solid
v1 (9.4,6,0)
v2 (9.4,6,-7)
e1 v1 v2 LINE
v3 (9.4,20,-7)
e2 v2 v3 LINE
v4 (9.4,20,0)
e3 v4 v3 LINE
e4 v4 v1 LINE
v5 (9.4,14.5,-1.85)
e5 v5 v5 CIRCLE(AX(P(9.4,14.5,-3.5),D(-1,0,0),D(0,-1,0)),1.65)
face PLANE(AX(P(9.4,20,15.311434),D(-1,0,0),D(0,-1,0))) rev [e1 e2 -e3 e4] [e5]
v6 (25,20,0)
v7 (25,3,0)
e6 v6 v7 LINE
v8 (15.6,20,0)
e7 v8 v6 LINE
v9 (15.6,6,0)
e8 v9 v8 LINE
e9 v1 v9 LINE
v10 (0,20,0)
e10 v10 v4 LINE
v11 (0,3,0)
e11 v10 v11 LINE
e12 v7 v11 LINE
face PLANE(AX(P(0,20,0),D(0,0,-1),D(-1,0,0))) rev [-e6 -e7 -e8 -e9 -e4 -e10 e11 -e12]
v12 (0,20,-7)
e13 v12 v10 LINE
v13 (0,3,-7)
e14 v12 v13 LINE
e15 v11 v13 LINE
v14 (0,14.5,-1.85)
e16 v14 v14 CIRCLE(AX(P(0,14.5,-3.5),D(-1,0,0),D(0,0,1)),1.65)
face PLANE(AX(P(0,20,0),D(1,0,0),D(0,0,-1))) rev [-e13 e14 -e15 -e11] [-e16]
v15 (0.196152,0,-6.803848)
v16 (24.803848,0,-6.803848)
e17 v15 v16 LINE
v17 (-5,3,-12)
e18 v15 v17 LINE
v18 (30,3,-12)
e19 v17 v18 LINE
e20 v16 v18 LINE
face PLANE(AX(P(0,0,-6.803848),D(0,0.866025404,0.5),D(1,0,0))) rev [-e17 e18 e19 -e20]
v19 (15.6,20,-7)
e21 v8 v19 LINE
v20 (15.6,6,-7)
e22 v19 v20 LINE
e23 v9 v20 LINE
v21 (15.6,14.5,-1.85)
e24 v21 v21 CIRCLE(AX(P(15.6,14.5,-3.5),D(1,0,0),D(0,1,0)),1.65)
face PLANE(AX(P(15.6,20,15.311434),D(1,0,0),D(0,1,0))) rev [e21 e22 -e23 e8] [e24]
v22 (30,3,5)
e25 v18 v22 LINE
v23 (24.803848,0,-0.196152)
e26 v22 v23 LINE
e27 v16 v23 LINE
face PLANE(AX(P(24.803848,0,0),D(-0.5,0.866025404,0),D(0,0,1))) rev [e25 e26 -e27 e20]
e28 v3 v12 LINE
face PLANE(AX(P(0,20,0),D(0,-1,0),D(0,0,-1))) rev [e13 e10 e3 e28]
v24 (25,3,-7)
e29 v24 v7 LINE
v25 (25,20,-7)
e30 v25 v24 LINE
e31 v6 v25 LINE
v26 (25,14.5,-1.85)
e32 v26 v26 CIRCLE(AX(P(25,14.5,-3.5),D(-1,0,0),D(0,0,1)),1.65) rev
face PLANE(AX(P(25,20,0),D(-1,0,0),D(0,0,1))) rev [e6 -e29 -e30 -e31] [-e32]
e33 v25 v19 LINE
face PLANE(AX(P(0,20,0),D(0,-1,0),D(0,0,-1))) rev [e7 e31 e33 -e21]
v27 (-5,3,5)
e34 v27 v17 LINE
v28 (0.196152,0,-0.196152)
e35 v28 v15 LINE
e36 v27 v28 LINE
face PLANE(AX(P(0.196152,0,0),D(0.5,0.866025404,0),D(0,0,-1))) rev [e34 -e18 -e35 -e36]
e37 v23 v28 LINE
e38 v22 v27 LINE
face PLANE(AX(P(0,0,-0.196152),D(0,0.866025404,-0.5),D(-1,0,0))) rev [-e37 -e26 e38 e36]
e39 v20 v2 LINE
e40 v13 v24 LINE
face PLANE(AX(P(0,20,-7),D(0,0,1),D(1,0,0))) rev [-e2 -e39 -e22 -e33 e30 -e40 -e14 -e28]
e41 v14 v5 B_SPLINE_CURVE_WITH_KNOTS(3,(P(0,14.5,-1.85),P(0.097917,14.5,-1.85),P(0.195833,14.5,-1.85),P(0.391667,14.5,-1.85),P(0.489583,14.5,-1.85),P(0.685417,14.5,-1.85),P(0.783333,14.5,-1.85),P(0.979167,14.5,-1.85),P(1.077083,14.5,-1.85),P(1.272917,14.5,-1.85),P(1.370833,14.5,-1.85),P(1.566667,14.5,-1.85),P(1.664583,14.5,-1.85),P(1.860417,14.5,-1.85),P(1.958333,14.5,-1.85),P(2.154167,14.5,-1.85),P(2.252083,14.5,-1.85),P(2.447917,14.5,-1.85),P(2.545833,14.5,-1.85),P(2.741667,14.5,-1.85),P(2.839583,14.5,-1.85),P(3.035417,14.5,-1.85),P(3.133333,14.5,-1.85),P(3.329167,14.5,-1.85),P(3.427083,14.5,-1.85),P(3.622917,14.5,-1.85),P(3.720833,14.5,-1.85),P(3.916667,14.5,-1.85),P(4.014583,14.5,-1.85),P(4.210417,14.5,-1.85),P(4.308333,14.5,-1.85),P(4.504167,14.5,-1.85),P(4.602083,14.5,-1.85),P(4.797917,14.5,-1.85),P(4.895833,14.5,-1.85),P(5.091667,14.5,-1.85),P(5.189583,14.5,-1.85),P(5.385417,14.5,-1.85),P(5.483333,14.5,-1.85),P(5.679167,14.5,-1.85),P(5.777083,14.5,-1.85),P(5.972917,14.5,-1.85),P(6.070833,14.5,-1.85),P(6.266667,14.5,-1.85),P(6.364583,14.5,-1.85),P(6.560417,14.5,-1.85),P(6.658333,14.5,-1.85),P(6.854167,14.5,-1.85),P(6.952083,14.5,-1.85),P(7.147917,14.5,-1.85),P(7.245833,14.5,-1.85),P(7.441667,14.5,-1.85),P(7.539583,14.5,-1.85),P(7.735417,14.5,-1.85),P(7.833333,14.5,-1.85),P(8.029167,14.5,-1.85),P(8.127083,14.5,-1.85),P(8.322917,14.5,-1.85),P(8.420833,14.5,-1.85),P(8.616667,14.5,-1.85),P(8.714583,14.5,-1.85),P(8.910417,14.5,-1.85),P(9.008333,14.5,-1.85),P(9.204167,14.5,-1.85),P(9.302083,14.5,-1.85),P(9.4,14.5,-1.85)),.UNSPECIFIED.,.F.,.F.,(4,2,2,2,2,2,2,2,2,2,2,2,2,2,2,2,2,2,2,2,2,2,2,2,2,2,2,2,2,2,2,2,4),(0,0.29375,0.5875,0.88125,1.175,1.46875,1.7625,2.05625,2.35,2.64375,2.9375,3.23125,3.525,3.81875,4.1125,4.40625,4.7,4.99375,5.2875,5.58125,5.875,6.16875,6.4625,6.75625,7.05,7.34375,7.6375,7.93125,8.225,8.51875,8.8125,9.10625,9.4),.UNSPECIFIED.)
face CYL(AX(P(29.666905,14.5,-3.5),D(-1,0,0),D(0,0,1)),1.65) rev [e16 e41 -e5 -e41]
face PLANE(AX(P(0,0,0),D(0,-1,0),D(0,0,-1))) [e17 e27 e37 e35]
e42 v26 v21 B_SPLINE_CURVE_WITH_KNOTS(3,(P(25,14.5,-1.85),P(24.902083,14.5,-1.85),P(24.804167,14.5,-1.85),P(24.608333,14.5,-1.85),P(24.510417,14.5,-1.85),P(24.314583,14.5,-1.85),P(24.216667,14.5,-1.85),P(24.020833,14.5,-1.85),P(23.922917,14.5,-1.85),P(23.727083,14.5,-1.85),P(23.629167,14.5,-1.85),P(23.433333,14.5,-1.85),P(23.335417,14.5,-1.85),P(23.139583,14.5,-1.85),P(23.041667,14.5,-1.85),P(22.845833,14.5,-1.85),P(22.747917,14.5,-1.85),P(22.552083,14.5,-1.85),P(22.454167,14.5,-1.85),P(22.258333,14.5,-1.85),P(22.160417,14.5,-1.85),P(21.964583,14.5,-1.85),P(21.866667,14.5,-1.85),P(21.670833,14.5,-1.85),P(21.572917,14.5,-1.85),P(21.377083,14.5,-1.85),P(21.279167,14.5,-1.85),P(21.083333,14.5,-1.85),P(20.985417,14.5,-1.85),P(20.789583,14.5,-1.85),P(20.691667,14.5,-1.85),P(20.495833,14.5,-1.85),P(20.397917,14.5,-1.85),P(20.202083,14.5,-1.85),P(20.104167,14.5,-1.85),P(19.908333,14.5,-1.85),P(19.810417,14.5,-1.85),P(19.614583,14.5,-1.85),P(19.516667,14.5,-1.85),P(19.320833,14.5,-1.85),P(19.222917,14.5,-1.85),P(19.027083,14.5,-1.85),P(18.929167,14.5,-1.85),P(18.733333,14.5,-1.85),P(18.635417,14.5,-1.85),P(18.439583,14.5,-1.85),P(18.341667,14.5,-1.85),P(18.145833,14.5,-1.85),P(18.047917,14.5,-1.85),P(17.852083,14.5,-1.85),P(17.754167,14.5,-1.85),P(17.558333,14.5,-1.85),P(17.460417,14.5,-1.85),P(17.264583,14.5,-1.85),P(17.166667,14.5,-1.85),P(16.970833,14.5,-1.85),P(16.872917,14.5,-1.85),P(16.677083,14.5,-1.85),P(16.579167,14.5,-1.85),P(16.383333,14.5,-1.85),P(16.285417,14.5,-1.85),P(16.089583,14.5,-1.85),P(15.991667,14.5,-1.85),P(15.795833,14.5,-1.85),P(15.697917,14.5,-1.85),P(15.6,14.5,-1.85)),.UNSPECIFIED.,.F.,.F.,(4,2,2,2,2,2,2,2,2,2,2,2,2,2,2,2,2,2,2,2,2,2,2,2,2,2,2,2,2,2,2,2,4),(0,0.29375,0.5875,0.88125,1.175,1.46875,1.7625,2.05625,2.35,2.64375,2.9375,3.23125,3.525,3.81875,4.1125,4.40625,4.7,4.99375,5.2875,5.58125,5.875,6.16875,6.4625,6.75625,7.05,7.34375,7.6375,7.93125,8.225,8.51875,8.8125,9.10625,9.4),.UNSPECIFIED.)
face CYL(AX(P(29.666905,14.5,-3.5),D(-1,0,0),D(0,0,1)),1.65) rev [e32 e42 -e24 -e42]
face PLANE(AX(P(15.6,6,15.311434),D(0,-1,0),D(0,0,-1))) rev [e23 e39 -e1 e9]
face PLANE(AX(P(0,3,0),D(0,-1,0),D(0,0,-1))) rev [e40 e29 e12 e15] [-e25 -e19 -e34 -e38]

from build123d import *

# Parameters (mm, degrees)
SKETCH1_W           = 25
SKETCH1_H           = 7
BOSS_EXTRUDE1_DEPTH = 20
SKETCH2_W           = 35
SKETCH2_H           = 17
BOSS_EXTRUDE2_DEPTH = 3
CHAMFER1_SIZE       = 5.196152423
CHAMFER1_SIZE_2     = 3
SKETCH3_W           = 6.2
SKETCH3_H           = 14
CUT_EXTRUDE1_DEPTH  = 7
CUT_EXTRUDE2_REACH  = 40
SKETCH4_R           = 1.65


with BuildPart() as part:
    # Sketch1 → Boss-Extrude1 (new body)
    with BuildSketch(Plane(origin=(0, 0, 0), x_dir=(1, 0, 0), z_dir=(0, 1, 0))):
        with Locations((12.5, 3.5)):
            Rectangle(SKETCH1_W, SKETCH1_H)
    extrude(amount=BOSS_EXTRUDE1_DEPTH)

    # Sketch2 → Boss-Extrude2 (add)
    with BuildSketch(Plane.XZ):
        with Locations((12.5, -3.5)):
            Rectangle(SKETCH2_W, SKETCH2_H)
    extrude(amount=-BOSS_EXTRUDE2_DEPTH)

    # Chamfer1
    # the kernel refuses this chamfer: 5.196152423, 3 mm, written as the material it takes off along each edge
    with BuildSketch(Plane(origin=(30, 0, 18.442891912), x_dir=(-0.9998132206222079, -0.01932676561270063, 0), z_dir=(0, 0, -1)), Plane(origin=(-5, 0, -25.442891912), x_dir=(0.9998132206222079, -0.019326765612700626, 0), z_dir=(0, 0, 1))) as chamfer1_piece_1:
        Polygon((CHAMFER1_SIZE * 0.999813220566, CHAMFER1_SIZE * 0.0193267656116), (-CHAMFER1_SIZE_2 * 0.0193267656127, CHAMFER1_SIZE_2 * 0.999813220622), (0, 0), align=None)
    extrude(amount=43.885783824, mode=Mode.SUBTRACT)
    with BuildSketch(Plane(origin=(-18.442891912, 0, 5), x_dir=(0, -0.019326765612700626, -0.9998132206222079), z_dir=(1, 0, 0)), Plane(origin=(43.442891912, 0, -12), x_dir=(0, -0.019326765612700622, 0.9998132206222079), z_dir=(-1, 0, 0))) as chamfer1_piece_2:
        Polygon((CHAMFER1_SIZE * 0.999813220566, CHAMFER1_SIZE * 0.0193267656116), (-CHAMFER1_SIZE_2 * 0.0193267656127, CHAMFER1_SIZE_2 * 0.999813220622), (0, 0), align=None)
    extrude(amount=61.885783824, mode=Mode.SUBTRACT)

    # Sketch3 → Cut-Extrude1 (cut)
    with BuildSketch(Plane(origin=(0, 0, -7), x_dir=(-1, 0, 0), z_dir=(0, 0, -1))):
        with Locations((-12.5, 13)):
            Rectangle(SKETCH3_W, SKETCH3_H)
    extrude(amount=-CUT_EXTRUDE1_DEPTH, mode=Mode.SUBTRACT)

    # Cut-Extrude2: up to this face of the body (flat: up to its plane)
    cut_extrude2_end = Plane(part.part.faces().sort_by_distance((25, 11.5, -3.5))[0])
    # Sketch4 → Cut-Extrude2 (cut, up to the picked face)
    with BuildSketch(Plane.ZY, mode=Mode.PRIVATE) as cut_extrude2_sk1:
        with Locations((-3.5, 14.5)):
            Circle(SKETCH4_R)
    cut_extrude2_tool1 = split(extrude(cut_extrude2_sk1.sketch, amount=-CUT_EXTRUDE2_REACH, mode=Mode.PRIVATE), bisect_by=cut_extrude2_end, keep=Keep.BOTH, mode=Mode.PRIVATE)
    add(cut_extrude2_tool1.solids().sort_by(Axis((0, 14.5, -3.5), (1, 0, 0)))[0], mode=Mode.SUBTRACT)


solid = part.part
